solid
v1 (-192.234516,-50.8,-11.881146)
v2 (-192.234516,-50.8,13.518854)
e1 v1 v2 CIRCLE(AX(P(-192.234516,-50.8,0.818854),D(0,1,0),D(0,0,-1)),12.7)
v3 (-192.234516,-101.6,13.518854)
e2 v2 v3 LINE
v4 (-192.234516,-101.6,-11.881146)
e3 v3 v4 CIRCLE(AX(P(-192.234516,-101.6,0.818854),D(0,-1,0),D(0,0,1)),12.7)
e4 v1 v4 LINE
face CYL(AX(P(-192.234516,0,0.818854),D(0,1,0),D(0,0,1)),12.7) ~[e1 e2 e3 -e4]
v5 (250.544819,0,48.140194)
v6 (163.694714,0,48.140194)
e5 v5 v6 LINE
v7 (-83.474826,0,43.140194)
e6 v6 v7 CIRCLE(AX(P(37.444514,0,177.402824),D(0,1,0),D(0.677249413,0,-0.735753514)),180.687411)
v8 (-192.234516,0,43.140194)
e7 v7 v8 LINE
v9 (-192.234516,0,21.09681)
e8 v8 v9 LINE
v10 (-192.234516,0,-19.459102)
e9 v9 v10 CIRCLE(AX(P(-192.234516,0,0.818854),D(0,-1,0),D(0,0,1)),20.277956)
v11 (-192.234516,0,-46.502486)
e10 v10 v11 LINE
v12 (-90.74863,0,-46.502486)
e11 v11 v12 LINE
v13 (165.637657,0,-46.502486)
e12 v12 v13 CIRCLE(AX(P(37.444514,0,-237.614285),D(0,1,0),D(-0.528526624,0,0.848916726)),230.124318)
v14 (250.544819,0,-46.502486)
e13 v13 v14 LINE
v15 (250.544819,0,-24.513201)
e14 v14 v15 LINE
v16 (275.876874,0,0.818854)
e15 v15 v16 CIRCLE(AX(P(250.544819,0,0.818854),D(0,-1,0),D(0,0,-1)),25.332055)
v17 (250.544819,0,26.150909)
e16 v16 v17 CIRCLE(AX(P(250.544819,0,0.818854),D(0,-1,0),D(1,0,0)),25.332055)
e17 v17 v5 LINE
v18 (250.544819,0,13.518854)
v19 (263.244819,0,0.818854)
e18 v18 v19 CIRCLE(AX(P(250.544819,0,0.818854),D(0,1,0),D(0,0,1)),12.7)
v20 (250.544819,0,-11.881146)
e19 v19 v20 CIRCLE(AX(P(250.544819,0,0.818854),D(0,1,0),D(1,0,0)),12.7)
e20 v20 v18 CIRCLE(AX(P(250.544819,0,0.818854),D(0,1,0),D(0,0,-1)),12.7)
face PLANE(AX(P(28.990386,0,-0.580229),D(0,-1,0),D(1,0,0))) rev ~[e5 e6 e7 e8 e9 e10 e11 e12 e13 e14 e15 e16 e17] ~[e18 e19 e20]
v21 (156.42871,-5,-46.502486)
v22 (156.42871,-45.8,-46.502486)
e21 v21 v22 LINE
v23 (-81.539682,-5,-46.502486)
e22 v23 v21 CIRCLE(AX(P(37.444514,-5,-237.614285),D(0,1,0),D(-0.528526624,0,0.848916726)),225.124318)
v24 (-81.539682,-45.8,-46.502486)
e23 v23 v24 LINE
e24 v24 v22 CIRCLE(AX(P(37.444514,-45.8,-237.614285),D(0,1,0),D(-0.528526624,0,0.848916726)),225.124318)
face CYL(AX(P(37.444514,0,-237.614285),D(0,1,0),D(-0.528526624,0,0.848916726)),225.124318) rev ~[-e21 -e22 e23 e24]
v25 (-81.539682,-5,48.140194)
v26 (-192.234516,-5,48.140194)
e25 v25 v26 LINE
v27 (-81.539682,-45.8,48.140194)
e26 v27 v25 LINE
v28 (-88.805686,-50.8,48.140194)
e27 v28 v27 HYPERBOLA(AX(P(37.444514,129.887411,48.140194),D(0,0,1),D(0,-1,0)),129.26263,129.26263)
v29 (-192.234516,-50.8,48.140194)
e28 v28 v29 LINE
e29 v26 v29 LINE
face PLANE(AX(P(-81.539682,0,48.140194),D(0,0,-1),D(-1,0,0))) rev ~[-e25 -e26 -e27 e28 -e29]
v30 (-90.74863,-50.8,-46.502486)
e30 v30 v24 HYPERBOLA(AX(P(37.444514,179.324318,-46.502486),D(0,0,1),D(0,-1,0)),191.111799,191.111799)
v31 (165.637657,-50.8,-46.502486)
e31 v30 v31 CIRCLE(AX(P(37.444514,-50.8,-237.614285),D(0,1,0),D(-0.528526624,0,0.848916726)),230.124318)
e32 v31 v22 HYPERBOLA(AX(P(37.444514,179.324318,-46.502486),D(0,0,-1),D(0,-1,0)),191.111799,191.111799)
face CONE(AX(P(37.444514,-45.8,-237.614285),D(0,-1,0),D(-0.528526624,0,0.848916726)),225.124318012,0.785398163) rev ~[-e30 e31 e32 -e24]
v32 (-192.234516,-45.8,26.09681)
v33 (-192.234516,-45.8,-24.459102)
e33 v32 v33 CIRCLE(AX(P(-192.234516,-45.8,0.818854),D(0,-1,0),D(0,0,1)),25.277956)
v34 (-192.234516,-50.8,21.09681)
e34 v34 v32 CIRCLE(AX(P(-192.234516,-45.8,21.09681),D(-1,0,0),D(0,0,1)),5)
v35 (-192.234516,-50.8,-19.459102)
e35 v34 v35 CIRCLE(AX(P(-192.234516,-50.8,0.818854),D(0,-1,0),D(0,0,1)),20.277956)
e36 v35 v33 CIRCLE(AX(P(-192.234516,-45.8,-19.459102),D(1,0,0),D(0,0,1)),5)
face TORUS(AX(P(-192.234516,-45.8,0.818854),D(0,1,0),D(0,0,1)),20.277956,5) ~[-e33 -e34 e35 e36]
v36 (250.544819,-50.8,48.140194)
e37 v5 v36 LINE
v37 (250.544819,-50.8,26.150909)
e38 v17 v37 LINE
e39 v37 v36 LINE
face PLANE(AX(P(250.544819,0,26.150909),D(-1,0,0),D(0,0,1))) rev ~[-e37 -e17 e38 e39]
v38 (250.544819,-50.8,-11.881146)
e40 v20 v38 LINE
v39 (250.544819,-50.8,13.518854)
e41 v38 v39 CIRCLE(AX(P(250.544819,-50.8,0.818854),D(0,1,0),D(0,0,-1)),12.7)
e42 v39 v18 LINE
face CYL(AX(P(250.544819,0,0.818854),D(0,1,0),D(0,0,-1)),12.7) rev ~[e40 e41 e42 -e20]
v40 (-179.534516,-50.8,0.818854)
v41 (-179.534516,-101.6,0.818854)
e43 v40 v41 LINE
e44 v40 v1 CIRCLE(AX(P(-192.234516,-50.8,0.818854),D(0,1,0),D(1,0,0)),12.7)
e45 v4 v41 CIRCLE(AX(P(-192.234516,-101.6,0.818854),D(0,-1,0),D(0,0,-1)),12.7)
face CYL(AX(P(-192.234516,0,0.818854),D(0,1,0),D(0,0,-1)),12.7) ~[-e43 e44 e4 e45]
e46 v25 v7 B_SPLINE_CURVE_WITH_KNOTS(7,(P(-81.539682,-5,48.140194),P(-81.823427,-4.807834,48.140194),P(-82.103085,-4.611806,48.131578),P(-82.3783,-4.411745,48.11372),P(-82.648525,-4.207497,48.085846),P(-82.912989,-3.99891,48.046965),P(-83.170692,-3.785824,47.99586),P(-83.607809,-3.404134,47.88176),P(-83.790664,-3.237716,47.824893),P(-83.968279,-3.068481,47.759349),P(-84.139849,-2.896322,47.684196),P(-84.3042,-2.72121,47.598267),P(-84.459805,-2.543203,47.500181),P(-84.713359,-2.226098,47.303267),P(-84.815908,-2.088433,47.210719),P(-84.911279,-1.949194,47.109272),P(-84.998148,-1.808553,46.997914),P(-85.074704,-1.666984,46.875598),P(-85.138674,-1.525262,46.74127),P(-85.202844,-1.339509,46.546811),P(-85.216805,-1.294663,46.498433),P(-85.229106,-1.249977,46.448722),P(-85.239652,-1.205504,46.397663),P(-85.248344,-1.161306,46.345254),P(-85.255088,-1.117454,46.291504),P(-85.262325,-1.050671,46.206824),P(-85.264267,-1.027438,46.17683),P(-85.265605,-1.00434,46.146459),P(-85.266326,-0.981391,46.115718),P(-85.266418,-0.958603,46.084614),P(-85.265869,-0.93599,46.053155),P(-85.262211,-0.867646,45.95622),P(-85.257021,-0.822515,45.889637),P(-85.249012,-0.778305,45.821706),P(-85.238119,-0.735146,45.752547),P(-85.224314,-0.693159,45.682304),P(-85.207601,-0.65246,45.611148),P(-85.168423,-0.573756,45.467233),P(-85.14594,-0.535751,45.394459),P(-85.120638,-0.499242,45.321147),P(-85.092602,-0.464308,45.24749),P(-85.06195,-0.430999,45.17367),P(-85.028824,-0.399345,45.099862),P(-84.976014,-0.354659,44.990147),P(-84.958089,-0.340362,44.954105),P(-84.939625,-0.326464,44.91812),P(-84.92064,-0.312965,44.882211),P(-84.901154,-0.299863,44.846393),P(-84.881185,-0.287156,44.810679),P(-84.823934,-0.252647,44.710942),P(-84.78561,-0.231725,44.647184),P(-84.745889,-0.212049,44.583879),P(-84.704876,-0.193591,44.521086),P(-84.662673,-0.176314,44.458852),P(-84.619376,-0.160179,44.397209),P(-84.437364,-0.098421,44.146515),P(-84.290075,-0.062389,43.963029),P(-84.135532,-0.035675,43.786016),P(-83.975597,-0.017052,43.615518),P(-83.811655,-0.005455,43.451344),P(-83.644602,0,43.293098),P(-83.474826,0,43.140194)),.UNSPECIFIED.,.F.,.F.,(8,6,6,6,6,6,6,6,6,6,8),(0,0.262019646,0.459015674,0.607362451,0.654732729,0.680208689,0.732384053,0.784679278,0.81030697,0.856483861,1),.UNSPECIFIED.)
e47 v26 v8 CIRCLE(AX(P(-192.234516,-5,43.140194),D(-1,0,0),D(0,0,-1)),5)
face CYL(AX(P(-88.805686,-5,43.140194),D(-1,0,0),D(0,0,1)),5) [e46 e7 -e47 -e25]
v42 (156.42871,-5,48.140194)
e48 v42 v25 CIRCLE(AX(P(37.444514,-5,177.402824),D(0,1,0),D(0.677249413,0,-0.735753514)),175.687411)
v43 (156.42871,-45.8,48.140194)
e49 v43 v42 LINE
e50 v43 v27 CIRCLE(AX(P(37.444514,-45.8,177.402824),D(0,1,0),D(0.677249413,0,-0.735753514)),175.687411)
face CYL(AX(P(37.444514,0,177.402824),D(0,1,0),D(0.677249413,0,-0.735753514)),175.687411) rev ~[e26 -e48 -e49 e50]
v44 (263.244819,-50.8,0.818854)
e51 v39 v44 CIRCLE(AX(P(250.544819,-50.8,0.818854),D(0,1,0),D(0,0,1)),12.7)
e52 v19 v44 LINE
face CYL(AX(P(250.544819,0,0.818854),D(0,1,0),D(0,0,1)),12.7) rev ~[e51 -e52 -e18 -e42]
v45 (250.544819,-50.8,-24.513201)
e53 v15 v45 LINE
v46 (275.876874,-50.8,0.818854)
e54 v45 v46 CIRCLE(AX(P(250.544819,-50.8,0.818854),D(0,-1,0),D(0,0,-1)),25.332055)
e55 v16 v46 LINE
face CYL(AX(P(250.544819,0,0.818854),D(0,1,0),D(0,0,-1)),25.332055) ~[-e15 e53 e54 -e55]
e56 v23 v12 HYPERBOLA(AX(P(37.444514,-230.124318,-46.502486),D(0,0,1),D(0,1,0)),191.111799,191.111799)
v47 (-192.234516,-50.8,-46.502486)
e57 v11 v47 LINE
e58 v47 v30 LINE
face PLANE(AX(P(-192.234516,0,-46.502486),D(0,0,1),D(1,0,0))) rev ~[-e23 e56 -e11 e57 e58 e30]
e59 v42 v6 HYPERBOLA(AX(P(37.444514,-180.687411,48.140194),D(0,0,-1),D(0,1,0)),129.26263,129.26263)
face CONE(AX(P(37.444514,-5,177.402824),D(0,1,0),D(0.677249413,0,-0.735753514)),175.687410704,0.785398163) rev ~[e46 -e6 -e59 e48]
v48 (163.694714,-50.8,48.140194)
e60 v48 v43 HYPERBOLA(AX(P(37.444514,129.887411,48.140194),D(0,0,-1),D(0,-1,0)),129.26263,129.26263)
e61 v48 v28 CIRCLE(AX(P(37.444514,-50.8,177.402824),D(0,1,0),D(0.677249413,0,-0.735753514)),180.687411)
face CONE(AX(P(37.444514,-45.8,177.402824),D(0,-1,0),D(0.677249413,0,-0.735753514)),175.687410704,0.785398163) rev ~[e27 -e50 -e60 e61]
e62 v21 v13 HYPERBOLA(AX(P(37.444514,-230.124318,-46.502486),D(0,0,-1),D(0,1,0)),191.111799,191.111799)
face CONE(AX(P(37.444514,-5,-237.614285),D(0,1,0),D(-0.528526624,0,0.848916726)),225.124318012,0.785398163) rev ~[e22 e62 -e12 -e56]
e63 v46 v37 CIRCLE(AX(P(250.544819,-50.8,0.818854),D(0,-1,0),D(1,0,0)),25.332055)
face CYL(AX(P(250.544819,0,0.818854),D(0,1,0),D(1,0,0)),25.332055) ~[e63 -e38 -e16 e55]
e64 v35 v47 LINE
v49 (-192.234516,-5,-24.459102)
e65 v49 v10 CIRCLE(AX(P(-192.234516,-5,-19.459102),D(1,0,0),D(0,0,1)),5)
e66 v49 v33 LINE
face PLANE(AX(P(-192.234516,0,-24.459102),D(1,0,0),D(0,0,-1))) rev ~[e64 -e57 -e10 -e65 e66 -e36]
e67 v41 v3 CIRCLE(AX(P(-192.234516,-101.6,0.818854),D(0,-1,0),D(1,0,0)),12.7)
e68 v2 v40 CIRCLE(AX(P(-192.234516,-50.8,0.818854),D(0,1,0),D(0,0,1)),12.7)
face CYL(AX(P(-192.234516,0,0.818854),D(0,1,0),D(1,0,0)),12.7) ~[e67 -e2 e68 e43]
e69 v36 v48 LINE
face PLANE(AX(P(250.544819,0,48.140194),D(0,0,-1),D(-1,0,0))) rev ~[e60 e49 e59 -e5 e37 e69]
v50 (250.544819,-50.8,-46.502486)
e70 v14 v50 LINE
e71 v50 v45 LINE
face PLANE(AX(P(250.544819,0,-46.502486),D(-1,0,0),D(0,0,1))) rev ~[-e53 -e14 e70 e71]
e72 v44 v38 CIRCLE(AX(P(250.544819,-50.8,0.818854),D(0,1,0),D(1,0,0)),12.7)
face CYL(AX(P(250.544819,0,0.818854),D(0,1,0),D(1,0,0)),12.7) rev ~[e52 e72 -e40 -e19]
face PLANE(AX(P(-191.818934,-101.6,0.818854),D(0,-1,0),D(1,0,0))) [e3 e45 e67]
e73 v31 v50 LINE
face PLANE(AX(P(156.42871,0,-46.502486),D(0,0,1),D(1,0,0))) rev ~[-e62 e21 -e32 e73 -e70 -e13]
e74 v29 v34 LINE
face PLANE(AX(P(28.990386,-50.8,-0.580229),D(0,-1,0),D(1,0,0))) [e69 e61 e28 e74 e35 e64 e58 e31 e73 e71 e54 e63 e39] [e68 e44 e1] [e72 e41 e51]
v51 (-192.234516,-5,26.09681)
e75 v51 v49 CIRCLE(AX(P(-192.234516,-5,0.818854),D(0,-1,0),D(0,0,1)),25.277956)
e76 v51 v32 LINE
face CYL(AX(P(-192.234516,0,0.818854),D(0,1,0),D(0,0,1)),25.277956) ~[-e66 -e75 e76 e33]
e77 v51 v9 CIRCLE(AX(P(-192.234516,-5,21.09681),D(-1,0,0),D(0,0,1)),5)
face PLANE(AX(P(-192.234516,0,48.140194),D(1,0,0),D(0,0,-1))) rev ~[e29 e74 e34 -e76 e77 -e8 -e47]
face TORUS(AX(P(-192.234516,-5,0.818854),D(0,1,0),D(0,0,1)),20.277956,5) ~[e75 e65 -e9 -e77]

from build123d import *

# Parameters (mm, degrees)
F1_DEPTH = 50.8
F2_DEPTH = 50.8
F3_DEPTH = 25.4
F4_DEPTH = 101.6
F5_SIZE  = 5
F6_R     = 5


with BuildPart() as f1:
    # F0 (on Front) → F1 (new body)
    with BuildSketch(Plane.XZ):
        with BuildLine():
            Line((-81.5396818683, 48.140194267), (-192.2345156552, 48.140194267))
            Line((-192.2345156552, 48.140194267), (-192.2345156552, 26.0968099283))
            ThreePointArc((-192.2345156552, 26.0968099283), (-174.3603015656, 18.6930680356), (-166.956559673, 0.8188539461))
            ThreePointArc((-166.956559673, 0.8188539461), (-174.3603015656, -17.0553601435), (-192.2345156552, -24.4591020361))
            Line((-192.2345156552, -24.4591020361), (-192.2345156552, -46.5024863749))
            Line((-192.2345156552, -46.5024863749), (-81.5396818683, -46.5024863749))
            ThreePointArc((-81.5396818683, -46.5024863749), (37.4445138693, -12.4899673839), (156.4287096069, -46.5024863749))
            Line((156.4287096069, -46.5024863749), (250.5448194923, -46.5024863749))
            Line((250.5448194923, -46.5024863749), (250.5448194923, -24.5132009882))
            ThreePointArc((250.5448194923, -24.5132009882), (225.212764558, 0.8188539461), (250.5448194923, 26.1509088804))
            Line((250.5448194923, 26.1509088804), (250.5448194923, 48.140194267))
            Line((250.5448194923, 48.140194267), (156.4287096069, 48.140194267))
            ThreePointArc((156.4287096069, 48.140194267), (37.4445138693, 1.7154132922), (-81.5396818683, 48.140194267))
        make_face()
    extrude(amount=F1_DEPTH)

    # F0 (on Front) → F2 (join)
    with BuildSketch(Plane.XZ):
        with BuildLine():
            Line((-81.5396818683, 48.140194267), (-192.2345156552, 48.140194267))
            Line((-192.2345156552, 48.140194267), (-192.2345156552, 26.0968099283))
            ThreePointArc((-192.2345156552, 26.0968099283), (-174.3603015656, 18.6930680356), (-166.956559673, 0.8188539461))
            ThreePointArc((-166.956559673, 0.8188539461), (-174.3603015656, -17.0553601435), (-192.2345156552, -24.4591020361))
            Line((-192.2345156552, -24.4591020361), (-192.2345156552, -46.5024863749))
            Line((-192.2345156552, -46.5024863749), (-81.5396818683, -46.5024863749))
            ThreePointArc((-81.5396818683, -46.5024863749), (37.4445138693, -12.4899673839), (156.4287096069, -46.5024863749))
            Line((156.4287096069, -46.5024863749), (250.5448194923, -46.5024863749))
            Line((250.5448194923, -46.5024863749), (250.5448194923, -24.5132009882))
            ThreePointArc((250.5448194923, -24.5132009882), (225.212764558, 0.8188539461), (250.5448194923, 26.1509088804))
            Line((250.5448194923, 26.1509088804), (250.5448194923, 48.140194267))
            Line((250.5448194923, 48.140194267), (156.4287096069, 48.140194267))
            ThreePointArc((156.4287096069, 48.140194267), (37.4445138693, 1.7154132922), (-81.5396818683, 48.140194267))
        make_face()
        with BuildLine():
            ThreePointArc((-166.956559673, 0.8188539461), (-174.3603015656, 18.6930680356), (-192.2345156552, 26.0968099283))
            Line((-192.2345156552, 26.0968099283), (-192.2345156552, 13.5188539461))
            ThreePointArc((-192.2345156552, 13.5188539461), (-183.2542595341, 9.7991100672), (-179.5345156552, 0.8188539461))
            ThreePointArc((-179.5345156552, 0.8188539461), (-183.2542595341, -8.161402175), (-192.2345156552, -11.8811460539))
            Line((-192.2345156552, -11.8811460539), (-192.2345156552, -24.4591020361))
            ThreePointArc((-192.2345156552, -24.4591020361), (-174.3603015656, -17.0553601435), (-166.956559673, 0.8188539461))
        make_face()
        with BuildLine():
            Line((-192.2345156552, 13.5188539461), (-192.2345156552, 26.0968099283))
            ThreePointArc((-192.2345156552, 26.0968099283), (-217.5124716374, 0.8188539461), (-192.2345156552, -24.4591020361))
            Line((-192.2345156552, -24.4591020361), (-192.2345156552, -11.8811460539))
            ThreePointArc((-192.2345156552, -11.8811460539), (-204.9345156552, 0.8188539461), (-192.2345156552, 13.5188539461))
        make_face()
        with BuildLine():
            ThreePointArc((275.8768744265, 0.8188539461), (268.4572873177, 18.7313217715), (250.5448194923, 26.1509088804))
            Line((250.5448194923, 26.1509088804), (250.5448194923, 13.5188539461))
            ThreePointArc((250.5448194923, 13.5188539461), (259.5250756133, 9.7991100672), (263.2448194923, 0.8188539461))
            ThreePointArc((263.2448194923, 0.8188539461), (259.5250756133, -8.161402175), (250.5448194923, -11.8811460539))
            Line((250.5448194923, -11.8811460539), (250.5448194923, -24.5132009882))
            ThreePointArc((250.5448194923, -24.5132009882), (268.4572873177, -17.0936138793), (275.8768744265, 0.8188539461))
        make_face()
        with BuildLine():
            Line((250.5448194923, 13.5188539461), (250.5448194923, 26.1509088804))
            ThreePointArc((250.5448194923, 26.1509088804), (225.212764558, 0.8188539461), (250.5448194923, -24.5132009882))
            Line((250.5448194923, -24.5132009882), (250.5448194923, -11.8811460539))
            ThreePointArc((250.5448194923, -11.8811460539), (237.8448194923, 0.8188539461), (250.5448194923, 13.5188539461))
        make_face()
    extrude(amount=F2_DEPTH)

    # F0 (on Front) → F3 (join)
    with BuildSketch(Plane.XZ):
        with BuildLine():
            Line((-81.5396818683, 48.140194267), (-192.2345156552, 48.140194267))
            Line((-192.2345156552, 48.140194267), (-192.2345156552, 26.0968099283))
            ThreePointArc((-192.2345156552, 26.0968099283), (-174.3603015656, 18.6930680356), (-166.956559673, 0.8188539461))
            ThreePointArc((-166.956559673, 0.8188539461), (-174.3603015656, -17.0553601435), (-192.2345156552, -24.4591020361))
            Line((-192.2345156552, -24.4591020361), (-192.2345156552, -46.5024863749))
            Line((-192.2345156552, -46.5024863749), (-81.5396818683, -46.5024863749))
            ThreePointArc((-81.5396818683, -46.5024863749), (37.4445138693, -12.4899673839), (156.4287096069, -46.5024863749))
            Line((156.4287096069, -46.5024863749), (250.5448194923, -46.5024863749))
            Line((250.5448194923, -46.5024863749), (250.5448194923, -24.5132009882))
            ThreePointArc((250.5448194923, -24.5132009882), (225.212764558, 0.8188539461), (250.5448194923, 26.1509088804))
            Line((250.5448194923, 26.1509088804), (250.5448194923, 48.140194267))
            Line((250.5448194923, 48.140194267), (156.4287096069, 48.140194267))
            ThreePointArc((156.4287096069, 48.140194267), (37.4445138693, 1.7154132922), (-81.5396818683, 48.140194267))
        make_face()
        with BuildLine():
            ThreePointArc((-166.956559673, 0.8188539461), (-174.3603015656, 18.6930680356), (-192.2345156552, 26.0968099283))
            Line((-192.2345156552, 26.0968099283), (-192.2345156552, 13.5188539461))
            ThreePointArc((-192.2345156552, 13.5188539461), (-183.2542595341, 9.7991100672), (-179.5345156552, 0.8188539461))
            ThreePointArc((-179.5345156552, 0.8188539461), (-183.2542595341, -8.161402175), (-192.2345156552, -11.8811460539))
            Line((-192.2345156552, -11.8811460539), (-192.2345156552, -24.4591020361))
            ThreePointArc((-192.2345156552, -24.4591020361), (-174.3603015656, -17.0553601435), (-166.956559673, 0.8188539461))
        make_face()
        with BuildLine():
            Line((-192.2345156552, 13.5188539461), (-192.2345156552, 26.0968099283))
            ThreePointArc((-192.2345156552, 26.0968099283), (-217.5124716374, 0.8188539461), (-192.2345156552, -24.4591020361))
            Line((-192.2345156552, -24.4591020361), (-192.2345156552, -11.8811460539))
            ThreePointArc((-192.2345156552, -11.8811460539), (-204.9345156552, 0.8188539461), (-192.2345156552, 13.5188539461))
        make_face()
        with BuildLine():
            ThreePointArc((275.8768744265, 0.8188539461), (268.4572873177, 18.7313217715), (250.5448194923, 26.1509088804))
            Line((250.5448194923, 26.1509088804), (250.5448194923, 13.5188539461))
            ThreePointArc((250.5448194923, 13.5188539461), (259.5250756133, 9.7991100672), (263.2448194923, 0.8188539461))
            ThreePointArc((263.2448194923, 0.8188539461), (259.5250756133, -8.161402175), (250.5448194923, -11.8811460539))
            Line((250.5448194923, -11.8811460539), (250.5448194923, -24.5132009882))
            ThreePointArc((250.5448194923, -24.5132009882), (268.4572873177, -17.0936138793), (275.8768744265, 0.8188539461))
        make_face()
        with BuildLine():
            Line((250.5448194923, 13.5188539461), (250.5448194923, 26.1509088804))
            ThreePointArc((250.5448194923, 26.1509088804), (225.212764558, 0.8188539461), (250.5448194923, -24.5132009882))
            Line((250.5448194923, -24.5132009882), (250.5448194923, -11.8811460539))
            ThreePointArc((250.5448194923, -11.8811460539), (237.8448194923, 0.8188539461), (250.5448194923, 13.5188539461))
        make_face()
    extrude(amount=F3_DEPTH)

    # F0 (on Front) → F4 (join)
    with BuildSketch(Plane.XZ):
        with BuildLine():
            ThreePointArc((-179.5345156552, 0.8188539461), (-183.2542595341, 9.7991100672), (-192.2345156552, 13.5188539461))
            ThreePointArc((-192.2345156552, 13.5188539461), (-204.9345156552, 0.8188539461), (-192.2345156552, -11.8811460539))
            ThreePointArc((-192.2345156552, -11.8811460539), (-183.2542595341, -8.161402175), (-179.5345156552, 0.8188539461))
        make_face()
    extrude(amount=F4_DEPTH)

    # F5
    f5_edges = [f1.edges().sort_by_distance(p)[0] for p in [
        (37.444514, 0, 1.715413),
        (37.444514, 0, -12.489967),
        (37.444514, -50.8, 1.715413),
        (37.444514, -50.8, -12.489967),
    ]]
    chamfer(f5_edges, length=F5_SIZE)

    # F6
    f6_edges = [f1.edges().sort_by_distance(p)[0] for p in [
        (-140.520101, 0, 48.140194),
        (-217.512472, 0, 0.818854),
        (-217.512472, -50.8, 0.818854),
    ]]
    fillet(f6_edges, radius=F6_R)


solid = f1.part
